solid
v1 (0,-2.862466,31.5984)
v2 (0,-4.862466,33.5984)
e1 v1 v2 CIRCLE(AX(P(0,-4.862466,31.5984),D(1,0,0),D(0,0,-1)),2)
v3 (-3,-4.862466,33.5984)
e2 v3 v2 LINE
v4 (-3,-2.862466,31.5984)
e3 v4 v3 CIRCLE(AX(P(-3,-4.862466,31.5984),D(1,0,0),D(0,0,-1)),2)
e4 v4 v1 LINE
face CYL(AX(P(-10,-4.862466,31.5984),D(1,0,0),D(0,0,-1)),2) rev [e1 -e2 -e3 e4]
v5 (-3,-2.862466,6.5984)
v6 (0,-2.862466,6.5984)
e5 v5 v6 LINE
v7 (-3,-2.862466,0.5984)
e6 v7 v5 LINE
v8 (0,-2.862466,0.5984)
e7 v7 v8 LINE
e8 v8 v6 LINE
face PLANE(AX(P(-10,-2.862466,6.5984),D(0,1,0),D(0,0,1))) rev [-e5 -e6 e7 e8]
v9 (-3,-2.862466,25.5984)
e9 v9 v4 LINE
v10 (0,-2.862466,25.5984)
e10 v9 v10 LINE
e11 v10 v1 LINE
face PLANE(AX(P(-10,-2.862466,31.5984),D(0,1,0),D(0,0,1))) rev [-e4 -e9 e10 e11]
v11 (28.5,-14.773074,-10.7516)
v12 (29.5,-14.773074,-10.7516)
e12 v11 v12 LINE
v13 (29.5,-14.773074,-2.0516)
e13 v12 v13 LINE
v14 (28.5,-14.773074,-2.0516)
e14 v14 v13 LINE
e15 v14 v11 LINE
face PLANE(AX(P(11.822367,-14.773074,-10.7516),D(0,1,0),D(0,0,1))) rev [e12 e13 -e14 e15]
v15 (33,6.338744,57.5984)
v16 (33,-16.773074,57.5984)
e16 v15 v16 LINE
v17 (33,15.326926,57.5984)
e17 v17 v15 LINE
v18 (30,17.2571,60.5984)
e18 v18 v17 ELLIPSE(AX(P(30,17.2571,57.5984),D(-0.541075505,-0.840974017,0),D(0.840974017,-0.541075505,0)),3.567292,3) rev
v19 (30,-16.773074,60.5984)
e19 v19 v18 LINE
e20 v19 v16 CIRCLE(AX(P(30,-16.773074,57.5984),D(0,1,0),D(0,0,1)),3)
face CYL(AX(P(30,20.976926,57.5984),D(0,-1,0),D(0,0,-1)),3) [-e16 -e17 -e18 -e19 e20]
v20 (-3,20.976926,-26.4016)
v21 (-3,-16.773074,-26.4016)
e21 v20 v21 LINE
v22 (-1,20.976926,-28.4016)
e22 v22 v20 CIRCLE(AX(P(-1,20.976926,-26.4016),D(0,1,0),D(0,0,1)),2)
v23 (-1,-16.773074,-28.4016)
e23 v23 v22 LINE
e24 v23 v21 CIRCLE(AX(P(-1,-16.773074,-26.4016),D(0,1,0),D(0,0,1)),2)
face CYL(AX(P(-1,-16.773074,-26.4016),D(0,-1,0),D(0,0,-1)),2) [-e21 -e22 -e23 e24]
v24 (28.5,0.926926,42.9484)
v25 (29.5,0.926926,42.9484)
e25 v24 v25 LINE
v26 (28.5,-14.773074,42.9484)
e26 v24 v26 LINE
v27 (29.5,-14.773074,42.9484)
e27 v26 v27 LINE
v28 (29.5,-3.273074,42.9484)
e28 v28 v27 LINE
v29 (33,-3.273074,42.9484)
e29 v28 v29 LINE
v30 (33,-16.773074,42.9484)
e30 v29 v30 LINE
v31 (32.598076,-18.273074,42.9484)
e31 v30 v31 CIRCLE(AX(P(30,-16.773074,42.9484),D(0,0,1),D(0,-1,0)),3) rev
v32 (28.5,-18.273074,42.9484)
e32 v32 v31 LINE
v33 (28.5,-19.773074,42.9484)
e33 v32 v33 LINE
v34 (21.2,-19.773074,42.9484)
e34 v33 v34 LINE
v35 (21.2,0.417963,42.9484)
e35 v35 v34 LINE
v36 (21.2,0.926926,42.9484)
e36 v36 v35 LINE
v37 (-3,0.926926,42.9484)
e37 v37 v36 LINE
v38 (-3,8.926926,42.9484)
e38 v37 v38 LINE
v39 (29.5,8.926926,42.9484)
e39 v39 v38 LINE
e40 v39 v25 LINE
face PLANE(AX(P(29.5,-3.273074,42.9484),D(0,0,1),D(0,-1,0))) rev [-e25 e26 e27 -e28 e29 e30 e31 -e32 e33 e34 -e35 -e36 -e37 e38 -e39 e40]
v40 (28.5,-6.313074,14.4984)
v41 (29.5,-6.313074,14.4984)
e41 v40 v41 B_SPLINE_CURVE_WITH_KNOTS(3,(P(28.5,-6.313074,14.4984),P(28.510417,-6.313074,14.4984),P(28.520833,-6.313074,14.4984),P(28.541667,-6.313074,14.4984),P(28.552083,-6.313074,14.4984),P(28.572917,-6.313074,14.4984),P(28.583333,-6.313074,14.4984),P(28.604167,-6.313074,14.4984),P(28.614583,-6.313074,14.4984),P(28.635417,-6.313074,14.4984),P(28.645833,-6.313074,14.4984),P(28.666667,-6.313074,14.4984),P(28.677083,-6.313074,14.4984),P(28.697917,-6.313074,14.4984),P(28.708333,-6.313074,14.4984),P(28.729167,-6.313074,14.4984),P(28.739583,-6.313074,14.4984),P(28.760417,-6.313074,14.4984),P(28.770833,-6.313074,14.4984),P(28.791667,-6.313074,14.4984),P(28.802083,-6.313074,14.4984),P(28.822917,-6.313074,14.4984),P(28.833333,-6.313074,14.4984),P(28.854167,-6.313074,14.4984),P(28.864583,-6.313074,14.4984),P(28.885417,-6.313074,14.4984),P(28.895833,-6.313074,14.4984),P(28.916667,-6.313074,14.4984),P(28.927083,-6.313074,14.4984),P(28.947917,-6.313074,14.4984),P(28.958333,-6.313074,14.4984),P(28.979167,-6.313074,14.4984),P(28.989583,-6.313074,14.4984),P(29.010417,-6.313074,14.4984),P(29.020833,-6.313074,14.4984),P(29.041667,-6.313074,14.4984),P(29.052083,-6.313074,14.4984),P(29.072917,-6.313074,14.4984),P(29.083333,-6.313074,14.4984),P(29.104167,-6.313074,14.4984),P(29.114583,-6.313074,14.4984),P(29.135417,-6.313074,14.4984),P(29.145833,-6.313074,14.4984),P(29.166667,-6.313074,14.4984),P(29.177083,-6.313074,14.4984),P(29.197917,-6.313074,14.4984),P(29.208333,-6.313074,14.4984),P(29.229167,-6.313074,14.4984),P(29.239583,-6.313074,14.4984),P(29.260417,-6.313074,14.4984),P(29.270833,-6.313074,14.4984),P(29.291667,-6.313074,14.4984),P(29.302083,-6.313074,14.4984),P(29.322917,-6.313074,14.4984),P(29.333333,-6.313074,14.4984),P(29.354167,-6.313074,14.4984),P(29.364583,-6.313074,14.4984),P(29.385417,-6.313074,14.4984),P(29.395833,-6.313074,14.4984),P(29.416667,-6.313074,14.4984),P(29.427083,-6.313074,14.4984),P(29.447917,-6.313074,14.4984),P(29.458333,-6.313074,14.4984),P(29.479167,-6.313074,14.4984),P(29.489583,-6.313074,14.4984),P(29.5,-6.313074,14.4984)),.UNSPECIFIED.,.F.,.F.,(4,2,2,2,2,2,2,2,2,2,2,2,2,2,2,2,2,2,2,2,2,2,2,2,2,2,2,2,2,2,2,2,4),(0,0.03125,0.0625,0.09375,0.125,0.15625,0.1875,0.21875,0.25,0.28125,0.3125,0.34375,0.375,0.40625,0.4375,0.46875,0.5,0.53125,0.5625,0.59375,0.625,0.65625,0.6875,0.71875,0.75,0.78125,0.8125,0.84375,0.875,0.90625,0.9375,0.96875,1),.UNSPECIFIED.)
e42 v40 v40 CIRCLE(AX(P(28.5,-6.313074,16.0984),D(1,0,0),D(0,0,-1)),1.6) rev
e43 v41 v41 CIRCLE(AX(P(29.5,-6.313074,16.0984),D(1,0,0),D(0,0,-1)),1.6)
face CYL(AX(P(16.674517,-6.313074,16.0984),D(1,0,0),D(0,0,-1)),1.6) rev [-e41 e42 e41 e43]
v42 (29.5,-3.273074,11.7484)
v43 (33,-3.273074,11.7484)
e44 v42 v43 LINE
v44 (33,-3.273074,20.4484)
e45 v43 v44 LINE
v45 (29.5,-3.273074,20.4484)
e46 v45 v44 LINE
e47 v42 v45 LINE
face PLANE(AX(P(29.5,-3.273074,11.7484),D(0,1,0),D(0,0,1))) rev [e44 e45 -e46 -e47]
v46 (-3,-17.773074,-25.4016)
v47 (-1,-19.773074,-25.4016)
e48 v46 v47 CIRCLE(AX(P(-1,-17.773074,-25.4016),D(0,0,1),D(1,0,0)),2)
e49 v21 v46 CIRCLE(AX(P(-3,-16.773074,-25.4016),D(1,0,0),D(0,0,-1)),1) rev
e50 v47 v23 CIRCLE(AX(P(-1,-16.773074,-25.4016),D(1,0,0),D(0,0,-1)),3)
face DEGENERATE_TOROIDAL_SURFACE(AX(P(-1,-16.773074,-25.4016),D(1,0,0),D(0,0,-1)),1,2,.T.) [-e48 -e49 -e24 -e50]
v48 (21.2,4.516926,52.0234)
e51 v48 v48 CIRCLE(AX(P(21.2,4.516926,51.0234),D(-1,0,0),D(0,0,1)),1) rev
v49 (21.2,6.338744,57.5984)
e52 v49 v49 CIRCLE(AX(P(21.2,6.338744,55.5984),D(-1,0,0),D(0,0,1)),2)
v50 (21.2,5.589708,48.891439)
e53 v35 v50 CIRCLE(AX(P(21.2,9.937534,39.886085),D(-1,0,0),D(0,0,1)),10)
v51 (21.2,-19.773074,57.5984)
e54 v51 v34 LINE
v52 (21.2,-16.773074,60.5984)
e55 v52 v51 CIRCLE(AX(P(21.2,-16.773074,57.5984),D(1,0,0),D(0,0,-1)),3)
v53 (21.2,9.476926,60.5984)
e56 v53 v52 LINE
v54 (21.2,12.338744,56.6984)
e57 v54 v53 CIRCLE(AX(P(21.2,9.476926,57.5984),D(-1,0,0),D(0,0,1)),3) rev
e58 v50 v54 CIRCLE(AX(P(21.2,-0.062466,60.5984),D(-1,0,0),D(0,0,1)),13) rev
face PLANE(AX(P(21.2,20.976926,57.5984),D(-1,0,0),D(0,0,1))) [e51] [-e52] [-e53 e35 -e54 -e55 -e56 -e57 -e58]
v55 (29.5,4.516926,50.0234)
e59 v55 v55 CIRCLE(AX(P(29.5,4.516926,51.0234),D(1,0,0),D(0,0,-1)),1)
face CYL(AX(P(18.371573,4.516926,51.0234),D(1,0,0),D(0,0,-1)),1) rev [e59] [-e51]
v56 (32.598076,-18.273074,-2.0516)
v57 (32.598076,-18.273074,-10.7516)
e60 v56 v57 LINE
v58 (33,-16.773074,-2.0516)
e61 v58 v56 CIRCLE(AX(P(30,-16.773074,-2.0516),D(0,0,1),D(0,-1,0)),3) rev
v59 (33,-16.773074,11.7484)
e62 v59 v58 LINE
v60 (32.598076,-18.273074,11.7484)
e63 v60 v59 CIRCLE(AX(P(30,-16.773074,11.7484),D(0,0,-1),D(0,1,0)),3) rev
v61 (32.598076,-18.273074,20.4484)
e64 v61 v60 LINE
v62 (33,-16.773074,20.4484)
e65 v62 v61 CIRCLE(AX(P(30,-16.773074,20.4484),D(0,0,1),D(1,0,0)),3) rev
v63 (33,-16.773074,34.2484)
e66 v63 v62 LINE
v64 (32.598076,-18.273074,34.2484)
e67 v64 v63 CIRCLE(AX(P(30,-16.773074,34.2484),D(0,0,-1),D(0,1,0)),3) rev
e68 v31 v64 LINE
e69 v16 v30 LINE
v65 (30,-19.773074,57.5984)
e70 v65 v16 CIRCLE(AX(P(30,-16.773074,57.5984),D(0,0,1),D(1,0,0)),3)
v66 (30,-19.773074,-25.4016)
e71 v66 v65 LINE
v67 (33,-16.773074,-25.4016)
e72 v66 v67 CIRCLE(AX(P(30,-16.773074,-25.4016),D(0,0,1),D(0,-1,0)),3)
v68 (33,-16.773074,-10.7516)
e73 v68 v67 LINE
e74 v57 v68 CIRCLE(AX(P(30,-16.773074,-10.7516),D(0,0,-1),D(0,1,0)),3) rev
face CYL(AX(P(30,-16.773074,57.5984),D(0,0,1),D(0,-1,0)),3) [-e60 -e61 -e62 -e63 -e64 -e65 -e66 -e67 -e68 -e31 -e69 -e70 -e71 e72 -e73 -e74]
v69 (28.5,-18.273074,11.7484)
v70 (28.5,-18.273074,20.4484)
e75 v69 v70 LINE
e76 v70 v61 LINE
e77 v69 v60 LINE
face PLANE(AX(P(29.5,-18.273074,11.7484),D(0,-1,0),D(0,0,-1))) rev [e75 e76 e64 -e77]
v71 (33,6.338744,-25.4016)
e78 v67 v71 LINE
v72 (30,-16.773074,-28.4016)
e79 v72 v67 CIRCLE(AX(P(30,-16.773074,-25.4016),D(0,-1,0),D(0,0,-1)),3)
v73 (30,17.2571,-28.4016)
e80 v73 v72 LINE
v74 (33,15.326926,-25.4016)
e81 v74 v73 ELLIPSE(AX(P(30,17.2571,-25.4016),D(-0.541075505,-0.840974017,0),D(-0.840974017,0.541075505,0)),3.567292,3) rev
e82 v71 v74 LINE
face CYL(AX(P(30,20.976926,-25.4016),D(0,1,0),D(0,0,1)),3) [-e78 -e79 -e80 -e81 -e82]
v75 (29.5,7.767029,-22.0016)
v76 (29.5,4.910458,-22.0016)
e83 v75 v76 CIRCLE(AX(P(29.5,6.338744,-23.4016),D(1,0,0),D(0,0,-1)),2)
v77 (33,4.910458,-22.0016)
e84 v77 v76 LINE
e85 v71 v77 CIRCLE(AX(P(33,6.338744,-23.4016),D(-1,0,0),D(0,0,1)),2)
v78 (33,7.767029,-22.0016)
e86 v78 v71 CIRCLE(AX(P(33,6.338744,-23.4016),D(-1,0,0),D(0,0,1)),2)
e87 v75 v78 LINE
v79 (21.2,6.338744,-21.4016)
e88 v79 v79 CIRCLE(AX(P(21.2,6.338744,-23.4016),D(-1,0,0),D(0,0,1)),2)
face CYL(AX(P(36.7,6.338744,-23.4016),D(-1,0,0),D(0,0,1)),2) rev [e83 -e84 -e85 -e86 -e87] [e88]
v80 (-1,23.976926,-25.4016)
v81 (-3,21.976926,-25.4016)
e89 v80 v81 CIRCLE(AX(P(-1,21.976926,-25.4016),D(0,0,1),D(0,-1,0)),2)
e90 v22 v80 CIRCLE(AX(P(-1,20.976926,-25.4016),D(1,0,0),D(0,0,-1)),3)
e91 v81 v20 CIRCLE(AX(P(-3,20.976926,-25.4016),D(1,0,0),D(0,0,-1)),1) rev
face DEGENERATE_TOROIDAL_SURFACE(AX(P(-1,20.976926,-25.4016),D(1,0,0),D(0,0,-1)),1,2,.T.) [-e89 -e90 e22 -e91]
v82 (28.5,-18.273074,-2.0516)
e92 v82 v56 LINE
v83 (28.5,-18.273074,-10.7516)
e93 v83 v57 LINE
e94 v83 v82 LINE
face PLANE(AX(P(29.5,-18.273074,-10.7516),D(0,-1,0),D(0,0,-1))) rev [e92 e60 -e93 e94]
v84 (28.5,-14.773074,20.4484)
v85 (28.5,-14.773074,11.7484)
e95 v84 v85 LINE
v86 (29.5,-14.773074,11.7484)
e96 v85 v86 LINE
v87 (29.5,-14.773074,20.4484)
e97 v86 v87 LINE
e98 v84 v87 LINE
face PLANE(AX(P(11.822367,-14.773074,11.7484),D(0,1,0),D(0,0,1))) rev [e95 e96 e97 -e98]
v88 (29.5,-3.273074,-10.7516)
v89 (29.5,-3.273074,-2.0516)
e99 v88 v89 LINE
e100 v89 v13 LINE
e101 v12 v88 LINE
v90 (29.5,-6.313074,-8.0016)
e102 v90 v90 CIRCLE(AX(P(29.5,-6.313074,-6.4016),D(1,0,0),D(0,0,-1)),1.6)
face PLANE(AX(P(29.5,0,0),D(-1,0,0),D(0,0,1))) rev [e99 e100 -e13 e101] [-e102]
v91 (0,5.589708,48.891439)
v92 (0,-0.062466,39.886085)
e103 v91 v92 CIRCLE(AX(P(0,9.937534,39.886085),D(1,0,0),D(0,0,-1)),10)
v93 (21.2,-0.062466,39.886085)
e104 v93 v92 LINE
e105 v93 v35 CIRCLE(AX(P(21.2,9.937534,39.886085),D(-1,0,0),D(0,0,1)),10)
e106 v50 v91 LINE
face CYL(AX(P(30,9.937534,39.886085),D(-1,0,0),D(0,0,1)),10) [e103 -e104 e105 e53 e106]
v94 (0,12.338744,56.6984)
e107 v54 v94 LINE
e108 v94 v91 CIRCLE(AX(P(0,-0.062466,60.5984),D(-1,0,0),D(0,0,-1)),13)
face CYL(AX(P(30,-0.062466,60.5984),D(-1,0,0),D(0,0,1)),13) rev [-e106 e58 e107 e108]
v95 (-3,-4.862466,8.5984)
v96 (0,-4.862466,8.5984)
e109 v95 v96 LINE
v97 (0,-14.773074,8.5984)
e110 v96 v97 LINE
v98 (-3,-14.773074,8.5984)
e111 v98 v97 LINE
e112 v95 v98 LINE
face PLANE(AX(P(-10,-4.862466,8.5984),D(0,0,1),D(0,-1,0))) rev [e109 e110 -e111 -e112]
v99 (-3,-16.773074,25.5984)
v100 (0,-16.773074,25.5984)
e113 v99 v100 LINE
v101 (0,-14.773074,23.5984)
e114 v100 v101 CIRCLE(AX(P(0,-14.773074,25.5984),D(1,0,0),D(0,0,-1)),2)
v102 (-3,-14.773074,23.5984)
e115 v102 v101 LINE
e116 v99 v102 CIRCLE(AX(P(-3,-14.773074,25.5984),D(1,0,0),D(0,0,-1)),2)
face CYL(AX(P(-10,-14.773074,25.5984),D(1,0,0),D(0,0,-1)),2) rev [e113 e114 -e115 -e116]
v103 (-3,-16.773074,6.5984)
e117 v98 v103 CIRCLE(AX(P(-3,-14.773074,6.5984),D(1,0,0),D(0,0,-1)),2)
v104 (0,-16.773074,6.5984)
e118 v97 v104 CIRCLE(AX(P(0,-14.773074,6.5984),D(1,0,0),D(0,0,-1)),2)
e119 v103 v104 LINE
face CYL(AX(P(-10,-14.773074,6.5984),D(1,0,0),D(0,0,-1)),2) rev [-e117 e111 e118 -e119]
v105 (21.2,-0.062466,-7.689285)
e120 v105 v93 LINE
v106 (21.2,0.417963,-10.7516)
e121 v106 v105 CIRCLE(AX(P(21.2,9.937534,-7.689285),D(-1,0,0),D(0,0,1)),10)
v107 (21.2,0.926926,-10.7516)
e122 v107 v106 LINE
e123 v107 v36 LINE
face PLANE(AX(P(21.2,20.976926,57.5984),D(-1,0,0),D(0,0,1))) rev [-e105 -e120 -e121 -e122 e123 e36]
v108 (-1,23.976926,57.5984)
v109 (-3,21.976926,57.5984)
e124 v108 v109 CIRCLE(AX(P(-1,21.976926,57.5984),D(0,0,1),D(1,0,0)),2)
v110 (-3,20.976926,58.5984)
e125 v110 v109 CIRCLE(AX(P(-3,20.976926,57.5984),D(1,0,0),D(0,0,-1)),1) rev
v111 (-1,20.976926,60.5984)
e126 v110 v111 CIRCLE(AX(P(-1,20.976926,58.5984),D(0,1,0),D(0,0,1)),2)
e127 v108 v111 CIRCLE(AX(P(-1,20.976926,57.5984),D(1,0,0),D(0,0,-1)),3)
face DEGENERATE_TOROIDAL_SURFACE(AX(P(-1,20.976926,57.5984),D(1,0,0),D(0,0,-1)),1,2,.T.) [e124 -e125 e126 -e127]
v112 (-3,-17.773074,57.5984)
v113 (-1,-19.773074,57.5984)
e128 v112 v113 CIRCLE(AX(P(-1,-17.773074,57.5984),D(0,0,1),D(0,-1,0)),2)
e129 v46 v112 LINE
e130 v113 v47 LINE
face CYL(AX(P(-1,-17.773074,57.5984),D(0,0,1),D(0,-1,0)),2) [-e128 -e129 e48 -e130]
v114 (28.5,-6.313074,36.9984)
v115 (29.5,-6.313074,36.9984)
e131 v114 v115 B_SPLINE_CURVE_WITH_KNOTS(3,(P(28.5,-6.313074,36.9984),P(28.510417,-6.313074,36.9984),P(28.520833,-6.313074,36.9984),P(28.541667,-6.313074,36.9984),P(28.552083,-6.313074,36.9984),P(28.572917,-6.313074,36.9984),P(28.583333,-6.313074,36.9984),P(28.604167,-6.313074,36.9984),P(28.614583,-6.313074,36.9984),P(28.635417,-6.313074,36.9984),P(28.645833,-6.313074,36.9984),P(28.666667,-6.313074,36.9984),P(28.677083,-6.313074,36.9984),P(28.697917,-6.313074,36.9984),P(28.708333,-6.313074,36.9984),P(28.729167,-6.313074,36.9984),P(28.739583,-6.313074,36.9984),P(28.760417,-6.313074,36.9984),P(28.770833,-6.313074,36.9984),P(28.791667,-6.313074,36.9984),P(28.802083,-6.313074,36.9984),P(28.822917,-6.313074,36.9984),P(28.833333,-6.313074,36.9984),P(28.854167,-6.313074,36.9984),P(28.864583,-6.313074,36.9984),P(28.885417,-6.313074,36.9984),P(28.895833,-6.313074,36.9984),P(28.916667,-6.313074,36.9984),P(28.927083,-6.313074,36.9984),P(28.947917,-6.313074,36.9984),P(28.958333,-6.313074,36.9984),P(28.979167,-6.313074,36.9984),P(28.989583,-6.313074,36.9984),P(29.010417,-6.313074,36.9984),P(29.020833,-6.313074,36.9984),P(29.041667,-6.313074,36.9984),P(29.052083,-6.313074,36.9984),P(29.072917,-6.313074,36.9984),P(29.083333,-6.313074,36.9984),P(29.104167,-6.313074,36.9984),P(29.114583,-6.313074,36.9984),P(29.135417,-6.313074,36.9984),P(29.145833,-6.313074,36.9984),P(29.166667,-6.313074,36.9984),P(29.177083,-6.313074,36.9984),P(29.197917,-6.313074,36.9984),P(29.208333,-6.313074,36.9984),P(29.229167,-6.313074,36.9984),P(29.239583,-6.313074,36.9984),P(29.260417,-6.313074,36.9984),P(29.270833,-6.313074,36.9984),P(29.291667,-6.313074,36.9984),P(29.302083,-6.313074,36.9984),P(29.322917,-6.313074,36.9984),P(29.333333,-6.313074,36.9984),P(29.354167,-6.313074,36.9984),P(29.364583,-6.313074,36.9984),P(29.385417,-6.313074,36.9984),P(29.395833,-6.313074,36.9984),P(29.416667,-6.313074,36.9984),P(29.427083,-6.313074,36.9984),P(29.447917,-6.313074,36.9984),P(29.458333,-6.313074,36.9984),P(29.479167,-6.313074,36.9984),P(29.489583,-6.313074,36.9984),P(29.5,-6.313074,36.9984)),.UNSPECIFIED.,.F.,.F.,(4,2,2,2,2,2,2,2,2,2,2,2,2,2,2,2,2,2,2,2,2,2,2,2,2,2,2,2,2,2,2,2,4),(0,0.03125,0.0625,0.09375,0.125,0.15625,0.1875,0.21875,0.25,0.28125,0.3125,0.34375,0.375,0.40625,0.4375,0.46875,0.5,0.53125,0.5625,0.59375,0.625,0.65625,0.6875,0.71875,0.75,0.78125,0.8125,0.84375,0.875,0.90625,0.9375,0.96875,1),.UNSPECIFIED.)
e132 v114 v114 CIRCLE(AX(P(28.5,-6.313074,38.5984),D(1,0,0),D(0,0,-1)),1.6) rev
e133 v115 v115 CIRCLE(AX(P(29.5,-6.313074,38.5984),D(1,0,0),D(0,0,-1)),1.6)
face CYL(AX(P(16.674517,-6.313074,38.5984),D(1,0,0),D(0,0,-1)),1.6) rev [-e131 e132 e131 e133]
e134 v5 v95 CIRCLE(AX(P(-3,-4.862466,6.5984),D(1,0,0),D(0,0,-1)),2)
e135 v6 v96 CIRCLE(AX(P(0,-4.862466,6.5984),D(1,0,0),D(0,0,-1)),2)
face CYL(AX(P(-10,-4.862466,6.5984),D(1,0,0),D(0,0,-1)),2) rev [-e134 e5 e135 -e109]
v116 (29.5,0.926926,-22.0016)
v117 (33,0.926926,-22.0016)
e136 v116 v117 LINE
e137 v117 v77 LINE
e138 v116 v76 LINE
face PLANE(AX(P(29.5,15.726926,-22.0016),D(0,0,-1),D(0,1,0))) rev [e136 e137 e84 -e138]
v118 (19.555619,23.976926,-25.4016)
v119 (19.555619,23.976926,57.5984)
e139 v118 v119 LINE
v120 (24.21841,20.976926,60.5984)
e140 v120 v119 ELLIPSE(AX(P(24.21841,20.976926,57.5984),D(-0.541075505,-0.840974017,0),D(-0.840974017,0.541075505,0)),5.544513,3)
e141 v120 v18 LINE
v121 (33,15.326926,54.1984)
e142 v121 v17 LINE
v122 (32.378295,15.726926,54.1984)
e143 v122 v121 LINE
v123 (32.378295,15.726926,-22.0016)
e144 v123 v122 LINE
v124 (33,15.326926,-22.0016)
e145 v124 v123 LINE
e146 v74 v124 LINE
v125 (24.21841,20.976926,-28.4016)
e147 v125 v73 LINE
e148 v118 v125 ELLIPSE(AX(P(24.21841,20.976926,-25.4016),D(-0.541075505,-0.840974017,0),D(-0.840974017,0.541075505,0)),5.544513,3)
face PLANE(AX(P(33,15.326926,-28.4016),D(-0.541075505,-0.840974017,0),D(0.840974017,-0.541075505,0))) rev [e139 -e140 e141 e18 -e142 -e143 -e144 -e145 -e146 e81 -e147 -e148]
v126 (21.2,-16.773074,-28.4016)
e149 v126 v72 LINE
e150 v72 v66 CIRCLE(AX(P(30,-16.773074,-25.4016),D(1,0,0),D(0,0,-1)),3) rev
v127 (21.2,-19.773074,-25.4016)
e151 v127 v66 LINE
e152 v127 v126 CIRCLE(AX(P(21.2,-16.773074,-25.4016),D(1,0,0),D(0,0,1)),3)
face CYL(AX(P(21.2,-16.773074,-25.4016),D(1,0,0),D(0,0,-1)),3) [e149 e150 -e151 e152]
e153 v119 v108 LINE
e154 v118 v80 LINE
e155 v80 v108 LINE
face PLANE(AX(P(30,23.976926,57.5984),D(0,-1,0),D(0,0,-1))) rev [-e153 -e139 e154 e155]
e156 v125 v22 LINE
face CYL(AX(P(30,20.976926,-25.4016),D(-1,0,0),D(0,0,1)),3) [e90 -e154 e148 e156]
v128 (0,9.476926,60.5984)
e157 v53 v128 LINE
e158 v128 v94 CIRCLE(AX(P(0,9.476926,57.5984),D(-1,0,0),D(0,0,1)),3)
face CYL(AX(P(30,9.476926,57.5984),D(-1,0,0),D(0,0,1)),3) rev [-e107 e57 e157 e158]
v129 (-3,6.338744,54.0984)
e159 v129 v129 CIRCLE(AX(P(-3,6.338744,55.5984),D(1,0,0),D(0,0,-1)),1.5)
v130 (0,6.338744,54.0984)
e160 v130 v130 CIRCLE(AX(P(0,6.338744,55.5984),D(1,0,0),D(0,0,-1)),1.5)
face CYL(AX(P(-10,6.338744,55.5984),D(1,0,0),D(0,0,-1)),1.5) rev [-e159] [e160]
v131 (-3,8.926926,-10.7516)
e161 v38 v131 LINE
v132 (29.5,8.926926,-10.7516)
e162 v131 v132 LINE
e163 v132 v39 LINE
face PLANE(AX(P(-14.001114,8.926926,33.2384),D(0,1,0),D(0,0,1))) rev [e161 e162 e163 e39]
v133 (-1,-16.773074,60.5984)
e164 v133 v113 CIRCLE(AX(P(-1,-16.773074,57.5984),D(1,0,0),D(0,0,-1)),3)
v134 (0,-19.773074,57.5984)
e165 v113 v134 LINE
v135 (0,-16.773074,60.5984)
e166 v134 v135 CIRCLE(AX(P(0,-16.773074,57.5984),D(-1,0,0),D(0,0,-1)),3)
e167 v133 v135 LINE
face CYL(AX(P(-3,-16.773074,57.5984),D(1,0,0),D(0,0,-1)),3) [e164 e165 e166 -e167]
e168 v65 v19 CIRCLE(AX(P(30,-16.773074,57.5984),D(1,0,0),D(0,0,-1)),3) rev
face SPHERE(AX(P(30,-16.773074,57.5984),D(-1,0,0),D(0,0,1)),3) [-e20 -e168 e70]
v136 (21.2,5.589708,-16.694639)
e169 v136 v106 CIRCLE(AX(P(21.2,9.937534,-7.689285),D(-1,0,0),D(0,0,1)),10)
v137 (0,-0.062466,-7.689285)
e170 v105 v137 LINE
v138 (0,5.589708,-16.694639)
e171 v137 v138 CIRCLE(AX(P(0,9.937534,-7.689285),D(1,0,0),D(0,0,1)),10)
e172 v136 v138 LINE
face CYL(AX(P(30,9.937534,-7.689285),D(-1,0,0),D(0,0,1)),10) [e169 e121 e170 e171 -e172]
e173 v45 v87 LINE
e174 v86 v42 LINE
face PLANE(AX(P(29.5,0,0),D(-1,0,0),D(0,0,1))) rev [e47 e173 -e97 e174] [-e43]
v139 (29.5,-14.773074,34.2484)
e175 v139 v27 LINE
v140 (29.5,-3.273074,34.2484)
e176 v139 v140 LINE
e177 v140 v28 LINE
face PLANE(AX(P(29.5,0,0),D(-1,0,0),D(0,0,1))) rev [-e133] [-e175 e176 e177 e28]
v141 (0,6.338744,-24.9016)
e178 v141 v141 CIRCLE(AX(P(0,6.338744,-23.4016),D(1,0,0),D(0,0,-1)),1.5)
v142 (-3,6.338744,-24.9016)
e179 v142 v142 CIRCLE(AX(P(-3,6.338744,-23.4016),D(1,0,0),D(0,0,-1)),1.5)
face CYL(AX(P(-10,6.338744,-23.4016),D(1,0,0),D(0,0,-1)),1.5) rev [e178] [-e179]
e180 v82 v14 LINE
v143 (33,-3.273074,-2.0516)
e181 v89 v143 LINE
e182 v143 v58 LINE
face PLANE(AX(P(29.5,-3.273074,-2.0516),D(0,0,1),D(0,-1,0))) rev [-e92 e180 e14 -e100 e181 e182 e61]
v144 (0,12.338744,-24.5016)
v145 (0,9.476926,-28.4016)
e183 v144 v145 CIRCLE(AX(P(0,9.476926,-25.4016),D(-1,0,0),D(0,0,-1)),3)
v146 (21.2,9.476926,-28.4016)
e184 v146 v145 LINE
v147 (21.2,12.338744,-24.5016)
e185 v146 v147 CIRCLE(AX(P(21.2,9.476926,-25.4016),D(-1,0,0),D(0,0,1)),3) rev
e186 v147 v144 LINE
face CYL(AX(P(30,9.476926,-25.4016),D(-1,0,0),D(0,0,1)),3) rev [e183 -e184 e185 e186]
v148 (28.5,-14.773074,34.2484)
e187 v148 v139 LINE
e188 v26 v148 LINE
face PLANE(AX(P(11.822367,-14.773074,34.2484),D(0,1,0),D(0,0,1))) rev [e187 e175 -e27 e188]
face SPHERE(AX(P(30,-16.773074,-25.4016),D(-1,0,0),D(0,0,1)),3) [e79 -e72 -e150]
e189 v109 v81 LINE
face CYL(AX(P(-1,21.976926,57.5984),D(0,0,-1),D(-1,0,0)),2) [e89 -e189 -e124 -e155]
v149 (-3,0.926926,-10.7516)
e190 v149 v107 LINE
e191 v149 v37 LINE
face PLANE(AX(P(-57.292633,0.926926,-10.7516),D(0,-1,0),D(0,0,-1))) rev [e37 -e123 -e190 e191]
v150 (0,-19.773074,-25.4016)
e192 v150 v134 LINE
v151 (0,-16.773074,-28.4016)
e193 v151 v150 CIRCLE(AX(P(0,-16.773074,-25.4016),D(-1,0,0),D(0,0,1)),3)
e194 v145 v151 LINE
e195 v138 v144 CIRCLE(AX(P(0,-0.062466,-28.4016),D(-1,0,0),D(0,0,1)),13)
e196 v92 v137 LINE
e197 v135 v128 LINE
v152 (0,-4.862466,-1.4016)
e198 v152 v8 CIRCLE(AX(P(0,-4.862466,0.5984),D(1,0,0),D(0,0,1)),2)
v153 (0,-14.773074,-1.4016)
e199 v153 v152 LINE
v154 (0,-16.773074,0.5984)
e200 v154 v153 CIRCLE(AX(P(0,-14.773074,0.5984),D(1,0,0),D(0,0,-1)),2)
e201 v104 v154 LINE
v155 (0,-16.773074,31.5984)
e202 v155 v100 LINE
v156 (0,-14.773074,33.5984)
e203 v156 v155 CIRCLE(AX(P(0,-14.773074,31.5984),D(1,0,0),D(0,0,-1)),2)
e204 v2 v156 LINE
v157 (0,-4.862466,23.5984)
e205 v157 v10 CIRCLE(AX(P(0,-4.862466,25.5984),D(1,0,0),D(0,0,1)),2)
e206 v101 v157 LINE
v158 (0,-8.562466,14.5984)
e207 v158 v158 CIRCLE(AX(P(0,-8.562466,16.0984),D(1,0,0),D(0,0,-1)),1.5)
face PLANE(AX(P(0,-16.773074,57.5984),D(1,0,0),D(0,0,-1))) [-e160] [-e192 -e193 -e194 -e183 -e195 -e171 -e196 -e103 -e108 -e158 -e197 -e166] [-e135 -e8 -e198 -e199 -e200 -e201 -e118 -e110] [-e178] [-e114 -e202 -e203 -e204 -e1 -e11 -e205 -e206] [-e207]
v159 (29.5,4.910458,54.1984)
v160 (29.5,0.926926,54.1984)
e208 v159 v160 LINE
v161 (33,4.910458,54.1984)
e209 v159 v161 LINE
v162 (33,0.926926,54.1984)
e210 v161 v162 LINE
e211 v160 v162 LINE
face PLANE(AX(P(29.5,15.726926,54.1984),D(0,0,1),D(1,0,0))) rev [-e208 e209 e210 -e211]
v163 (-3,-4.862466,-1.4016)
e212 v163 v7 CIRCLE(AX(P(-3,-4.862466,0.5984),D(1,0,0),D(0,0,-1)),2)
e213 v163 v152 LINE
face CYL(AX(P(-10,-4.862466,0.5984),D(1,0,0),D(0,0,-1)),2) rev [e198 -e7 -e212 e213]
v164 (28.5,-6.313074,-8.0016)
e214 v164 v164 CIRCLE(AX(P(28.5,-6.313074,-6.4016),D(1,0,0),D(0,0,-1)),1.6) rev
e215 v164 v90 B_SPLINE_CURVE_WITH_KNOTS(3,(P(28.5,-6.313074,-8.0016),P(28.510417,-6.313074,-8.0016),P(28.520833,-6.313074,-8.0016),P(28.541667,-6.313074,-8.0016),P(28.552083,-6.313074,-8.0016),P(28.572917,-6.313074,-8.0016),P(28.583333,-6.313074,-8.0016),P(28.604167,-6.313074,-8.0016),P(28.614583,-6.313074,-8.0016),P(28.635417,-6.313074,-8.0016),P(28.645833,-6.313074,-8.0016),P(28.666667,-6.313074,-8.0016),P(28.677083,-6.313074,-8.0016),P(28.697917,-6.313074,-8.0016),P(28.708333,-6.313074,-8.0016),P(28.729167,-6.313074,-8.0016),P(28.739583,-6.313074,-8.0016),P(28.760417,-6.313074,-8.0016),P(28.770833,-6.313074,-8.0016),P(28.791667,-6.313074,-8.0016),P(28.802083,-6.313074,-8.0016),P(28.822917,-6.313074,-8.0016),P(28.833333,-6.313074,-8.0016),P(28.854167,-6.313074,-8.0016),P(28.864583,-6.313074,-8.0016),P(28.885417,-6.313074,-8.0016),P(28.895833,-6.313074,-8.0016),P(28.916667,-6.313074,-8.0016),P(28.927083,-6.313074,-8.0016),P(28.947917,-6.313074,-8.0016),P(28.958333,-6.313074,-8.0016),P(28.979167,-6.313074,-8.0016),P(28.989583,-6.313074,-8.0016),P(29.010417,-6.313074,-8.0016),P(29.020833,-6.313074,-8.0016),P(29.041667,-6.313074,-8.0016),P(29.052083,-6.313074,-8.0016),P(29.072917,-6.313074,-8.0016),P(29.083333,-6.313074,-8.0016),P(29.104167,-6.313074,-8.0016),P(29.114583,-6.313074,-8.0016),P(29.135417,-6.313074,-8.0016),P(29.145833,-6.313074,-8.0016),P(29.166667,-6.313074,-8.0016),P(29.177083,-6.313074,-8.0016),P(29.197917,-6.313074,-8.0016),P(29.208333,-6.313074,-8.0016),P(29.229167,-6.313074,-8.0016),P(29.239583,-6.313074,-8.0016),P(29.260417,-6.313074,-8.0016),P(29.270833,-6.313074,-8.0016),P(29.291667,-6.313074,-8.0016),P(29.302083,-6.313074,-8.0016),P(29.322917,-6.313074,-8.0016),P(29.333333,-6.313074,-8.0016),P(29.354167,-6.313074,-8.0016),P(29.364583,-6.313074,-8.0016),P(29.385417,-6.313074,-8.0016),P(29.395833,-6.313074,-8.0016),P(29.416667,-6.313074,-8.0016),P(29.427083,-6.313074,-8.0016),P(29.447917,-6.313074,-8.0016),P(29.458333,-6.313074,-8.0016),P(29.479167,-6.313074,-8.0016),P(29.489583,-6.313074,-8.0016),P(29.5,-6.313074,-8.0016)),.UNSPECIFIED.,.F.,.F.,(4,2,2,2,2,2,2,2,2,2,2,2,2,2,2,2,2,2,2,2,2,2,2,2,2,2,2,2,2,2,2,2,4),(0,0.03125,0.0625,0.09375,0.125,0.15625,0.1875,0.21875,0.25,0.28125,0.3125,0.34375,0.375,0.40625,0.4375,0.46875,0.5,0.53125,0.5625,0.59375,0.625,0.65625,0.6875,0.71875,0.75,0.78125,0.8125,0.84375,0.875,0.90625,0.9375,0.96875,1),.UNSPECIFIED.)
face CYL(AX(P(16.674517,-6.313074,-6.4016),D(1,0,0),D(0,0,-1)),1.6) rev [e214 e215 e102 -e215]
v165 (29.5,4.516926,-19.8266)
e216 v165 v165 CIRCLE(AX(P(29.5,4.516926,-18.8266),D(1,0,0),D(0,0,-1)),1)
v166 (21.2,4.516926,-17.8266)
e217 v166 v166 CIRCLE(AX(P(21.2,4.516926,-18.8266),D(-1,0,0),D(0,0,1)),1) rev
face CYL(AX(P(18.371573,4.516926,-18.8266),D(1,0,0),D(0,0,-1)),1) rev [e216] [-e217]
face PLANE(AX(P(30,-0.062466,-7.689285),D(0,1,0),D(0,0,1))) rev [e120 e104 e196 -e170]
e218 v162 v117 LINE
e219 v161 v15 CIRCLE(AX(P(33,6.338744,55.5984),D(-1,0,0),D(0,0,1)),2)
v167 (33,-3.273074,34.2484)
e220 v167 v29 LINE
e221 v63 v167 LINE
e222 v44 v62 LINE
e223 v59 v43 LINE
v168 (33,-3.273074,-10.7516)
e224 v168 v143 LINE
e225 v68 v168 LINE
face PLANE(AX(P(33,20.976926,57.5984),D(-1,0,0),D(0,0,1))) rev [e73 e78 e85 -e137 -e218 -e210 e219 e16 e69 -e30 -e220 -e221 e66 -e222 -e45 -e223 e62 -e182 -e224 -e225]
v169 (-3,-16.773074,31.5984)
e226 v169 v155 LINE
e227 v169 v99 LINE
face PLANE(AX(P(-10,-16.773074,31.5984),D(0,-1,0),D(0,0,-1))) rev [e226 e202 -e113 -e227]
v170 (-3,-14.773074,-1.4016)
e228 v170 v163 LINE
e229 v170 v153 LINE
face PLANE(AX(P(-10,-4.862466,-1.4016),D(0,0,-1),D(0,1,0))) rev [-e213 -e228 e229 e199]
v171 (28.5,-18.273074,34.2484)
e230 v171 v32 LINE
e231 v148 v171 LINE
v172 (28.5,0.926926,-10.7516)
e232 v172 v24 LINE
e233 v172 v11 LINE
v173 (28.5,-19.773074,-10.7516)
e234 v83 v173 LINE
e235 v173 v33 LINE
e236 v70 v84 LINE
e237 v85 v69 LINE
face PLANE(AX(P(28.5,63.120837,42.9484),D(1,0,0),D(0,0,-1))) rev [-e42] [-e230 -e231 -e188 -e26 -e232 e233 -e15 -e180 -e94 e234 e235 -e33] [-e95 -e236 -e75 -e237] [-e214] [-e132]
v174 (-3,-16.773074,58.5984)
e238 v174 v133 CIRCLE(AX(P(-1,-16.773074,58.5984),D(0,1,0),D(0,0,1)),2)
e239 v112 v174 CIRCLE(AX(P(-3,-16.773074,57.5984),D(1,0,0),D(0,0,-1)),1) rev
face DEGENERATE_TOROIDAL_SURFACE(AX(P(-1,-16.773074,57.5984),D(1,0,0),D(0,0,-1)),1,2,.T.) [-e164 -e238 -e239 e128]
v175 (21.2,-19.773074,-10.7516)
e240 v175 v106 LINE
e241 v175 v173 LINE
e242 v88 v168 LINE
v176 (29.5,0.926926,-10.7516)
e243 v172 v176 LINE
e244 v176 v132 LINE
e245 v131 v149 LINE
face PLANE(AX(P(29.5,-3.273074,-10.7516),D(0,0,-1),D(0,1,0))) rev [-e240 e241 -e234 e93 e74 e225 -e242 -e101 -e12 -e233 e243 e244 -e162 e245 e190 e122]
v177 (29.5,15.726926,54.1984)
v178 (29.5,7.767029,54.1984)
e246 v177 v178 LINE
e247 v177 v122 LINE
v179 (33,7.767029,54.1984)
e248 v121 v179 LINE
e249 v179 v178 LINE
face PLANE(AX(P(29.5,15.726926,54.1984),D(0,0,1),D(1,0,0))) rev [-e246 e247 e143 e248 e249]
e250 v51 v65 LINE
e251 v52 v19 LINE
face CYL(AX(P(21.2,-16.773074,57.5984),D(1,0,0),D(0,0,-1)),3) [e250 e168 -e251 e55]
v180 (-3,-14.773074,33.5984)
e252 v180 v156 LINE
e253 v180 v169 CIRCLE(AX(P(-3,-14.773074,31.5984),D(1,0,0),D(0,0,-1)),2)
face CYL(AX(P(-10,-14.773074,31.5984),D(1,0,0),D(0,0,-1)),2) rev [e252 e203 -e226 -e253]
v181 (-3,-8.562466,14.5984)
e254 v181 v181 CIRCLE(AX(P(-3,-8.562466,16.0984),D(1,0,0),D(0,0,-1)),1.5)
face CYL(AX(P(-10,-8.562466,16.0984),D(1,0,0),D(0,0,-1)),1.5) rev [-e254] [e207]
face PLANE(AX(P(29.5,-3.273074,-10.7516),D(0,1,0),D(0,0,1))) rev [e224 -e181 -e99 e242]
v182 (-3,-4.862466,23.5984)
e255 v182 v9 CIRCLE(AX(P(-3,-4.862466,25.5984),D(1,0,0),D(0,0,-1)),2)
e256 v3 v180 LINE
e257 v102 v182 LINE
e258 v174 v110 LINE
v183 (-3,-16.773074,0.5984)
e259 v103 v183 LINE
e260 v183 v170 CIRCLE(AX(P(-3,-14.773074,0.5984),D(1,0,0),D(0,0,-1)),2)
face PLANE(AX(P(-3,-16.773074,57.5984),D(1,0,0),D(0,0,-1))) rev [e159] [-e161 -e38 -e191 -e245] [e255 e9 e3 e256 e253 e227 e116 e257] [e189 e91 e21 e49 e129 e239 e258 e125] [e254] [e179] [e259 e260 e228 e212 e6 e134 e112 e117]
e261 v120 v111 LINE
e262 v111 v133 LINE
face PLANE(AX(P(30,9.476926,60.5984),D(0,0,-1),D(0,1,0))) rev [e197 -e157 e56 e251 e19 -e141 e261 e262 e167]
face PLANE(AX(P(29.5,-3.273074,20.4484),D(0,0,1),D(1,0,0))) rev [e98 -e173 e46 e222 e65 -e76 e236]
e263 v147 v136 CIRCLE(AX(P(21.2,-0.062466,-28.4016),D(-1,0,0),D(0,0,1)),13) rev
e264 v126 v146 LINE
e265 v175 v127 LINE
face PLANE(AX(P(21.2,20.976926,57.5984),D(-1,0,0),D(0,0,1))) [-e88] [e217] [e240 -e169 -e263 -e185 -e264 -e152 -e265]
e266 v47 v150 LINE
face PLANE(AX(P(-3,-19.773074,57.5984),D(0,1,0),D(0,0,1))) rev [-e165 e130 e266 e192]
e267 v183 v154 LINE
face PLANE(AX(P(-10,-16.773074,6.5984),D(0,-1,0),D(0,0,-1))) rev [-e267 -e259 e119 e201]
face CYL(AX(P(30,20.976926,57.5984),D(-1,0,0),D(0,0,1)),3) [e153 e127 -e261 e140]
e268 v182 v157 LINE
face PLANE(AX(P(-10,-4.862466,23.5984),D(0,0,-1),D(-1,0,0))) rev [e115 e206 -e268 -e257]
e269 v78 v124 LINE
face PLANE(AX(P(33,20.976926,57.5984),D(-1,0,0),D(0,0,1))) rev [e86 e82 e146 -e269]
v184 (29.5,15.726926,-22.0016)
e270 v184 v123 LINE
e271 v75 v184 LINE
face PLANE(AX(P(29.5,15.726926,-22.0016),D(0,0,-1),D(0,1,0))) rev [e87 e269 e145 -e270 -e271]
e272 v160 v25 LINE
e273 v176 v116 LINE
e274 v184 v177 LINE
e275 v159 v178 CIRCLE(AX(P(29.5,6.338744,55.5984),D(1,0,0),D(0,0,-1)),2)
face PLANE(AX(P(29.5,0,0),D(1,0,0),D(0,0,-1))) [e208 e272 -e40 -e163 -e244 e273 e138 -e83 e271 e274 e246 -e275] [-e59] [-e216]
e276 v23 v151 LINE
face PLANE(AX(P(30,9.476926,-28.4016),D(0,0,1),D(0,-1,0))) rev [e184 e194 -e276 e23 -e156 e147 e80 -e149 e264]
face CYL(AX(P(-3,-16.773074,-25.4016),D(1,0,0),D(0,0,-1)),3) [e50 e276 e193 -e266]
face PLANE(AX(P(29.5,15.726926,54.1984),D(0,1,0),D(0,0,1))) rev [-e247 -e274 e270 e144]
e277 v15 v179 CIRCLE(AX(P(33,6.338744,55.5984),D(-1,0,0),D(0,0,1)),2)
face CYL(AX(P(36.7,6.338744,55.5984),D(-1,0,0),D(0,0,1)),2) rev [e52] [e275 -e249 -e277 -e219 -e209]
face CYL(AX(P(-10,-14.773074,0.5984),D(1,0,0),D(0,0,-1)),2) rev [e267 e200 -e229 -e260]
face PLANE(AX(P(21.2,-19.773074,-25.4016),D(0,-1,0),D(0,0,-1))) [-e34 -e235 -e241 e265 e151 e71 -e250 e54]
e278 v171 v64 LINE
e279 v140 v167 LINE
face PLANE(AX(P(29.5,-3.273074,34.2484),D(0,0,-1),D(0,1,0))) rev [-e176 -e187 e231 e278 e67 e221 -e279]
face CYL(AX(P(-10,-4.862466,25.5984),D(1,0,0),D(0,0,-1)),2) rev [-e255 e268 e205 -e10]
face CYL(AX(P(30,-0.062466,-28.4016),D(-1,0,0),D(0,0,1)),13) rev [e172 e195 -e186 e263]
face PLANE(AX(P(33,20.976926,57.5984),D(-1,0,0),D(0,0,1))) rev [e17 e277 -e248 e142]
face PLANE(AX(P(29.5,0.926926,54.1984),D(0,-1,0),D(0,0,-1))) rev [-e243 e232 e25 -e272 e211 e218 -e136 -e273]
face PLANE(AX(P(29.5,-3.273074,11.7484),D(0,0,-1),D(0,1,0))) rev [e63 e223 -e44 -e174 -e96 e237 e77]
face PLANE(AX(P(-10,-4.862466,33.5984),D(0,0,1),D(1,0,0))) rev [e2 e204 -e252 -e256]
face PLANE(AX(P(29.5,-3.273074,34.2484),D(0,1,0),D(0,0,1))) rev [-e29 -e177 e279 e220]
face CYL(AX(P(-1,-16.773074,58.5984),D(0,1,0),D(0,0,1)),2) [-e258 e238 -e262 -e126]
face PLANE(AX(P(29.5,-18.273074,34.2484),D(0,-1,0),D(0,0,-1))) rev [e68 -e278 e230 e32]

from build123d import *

# Parameters (mm, degrees)
RESSALTO_EXTRUS_O2_DEPTH      = 30
RESSALTO_EXTRUS_O3_START      = 3
RESSALTO_EXTRUS_O3_DEPTH      = 3
RESSALTO_EXTRUS_O4_DEPTH      = 3
RESSALTO_EXTRUS_O4_DEPTH_BACK = 8.8
ESBO_O10_R                    = 1.500000000000004
ESBO_O10_R_2                  = 1.5000000000000007
ESBO_O10_R_3                  = 1.5000000000000009
CORTE_EXTRUS_O3_DEPTH         = 9.999999999999998
CORTE_EXTRUS_O4_DEPTH         = 9.999999999999998
FILETE2_R                     = 2
ESBO_O13_R                    = 1.5000000000000007
ESBO_O13_R_2                  = 1.4999999999999998
CORTE_EXTRUS_O5_DEPTH         = 16
CORTE_EXTRUS_O6_DEPTH         = 3.5
ESBO_O16_R                    = 0.9999999999999981
ESBO_O16_R_2                  = 1.0000000000000013
CORTE_EXTRUS_O7_DEPTH         = 8.3
CORTE_EXTRUS_O8_DEPTH         = 3.5
ESBO_O20_R                    = 1.5999999999999979
ESBO_O20_R_2                  = 1.6000000000000019
CORTE_EXTRUS_O9_DEPTH         = 8.3
ESBO_O21_W                    = 8.700000000000001
ESBO_O21_H                    = 3.4999999999999982
CORTE_EXTRUS_O10_DEPTH        = 8.3
CORTE_EXTRUS_O11_DEPTH        = 8.3
CORTE_EXTRUS_O12_REACH        = 83.702
CORTE_EXTRUS_O15_DEPTH        = 98.90246669046874
ESBO_O27_R                    = 1.9999999999999996
CORTE_EXTRUS_O16_DEPTH        = 15.5
ESBO_O29_R                    = 2.000000000000003
CORTE_EXTRUS_O17_DEPTH        = 15.5
FILETE5_R                     = 3
CORTE_EXTRUS_O18_DEPTH        = 70.5176170215178
CORTE_EXTRUS_O18_DEPTH_BACK   = 24.2


with BuildPart() as part:
    # Esboço2 → Ressalto-extrusão2 (new body)
    with BuildSketch(Plane(origin=(0, 0, 0), x_dir=(0, 0, -1), z_dir=(1, 0, 0))):
        with BuildLine():
            Line((2.901599919865161, -0.06246593766177921), (-35.09840008013481, -0.06246593766176534))
            Line((-35.09840008013481, -0.06246593766176534), (-39.886084902926825, -0.06246593766177921))
            ThreePointArc((-39.886084902926825, -0.06246593766177921), (-45.20218023363878, 1.4676385237390175), (-48.891439327799866, 5.589707975381692))
            ThreePointArc((-48.891439327799866, 5.589707975381692), (-52.09653694789475, 9.772081498832542), (-56.69840008013493, 12.338743680758546))
            ThreePointArc((-56.69840008013493, 12.338743680758546), (-59.37322401506481, 11.895603400997262), (-60.5984000801349, 9.476926076507686))
            Line((-60.5984000801349, 9.476926076507686), (-60.598400080134894, 20.976926076507663))
            ThreePointArc((-60.598400080134894, 20.976926076507663), (-59.71972042369454, 23.098246420067323), (-57.59840008013488, 23.976926076507684))
            Line((-57.59840008013488, 23.976926076507684), (25.401599919865156, 23.976926076507684))
            ThreePointArc((25.401599919865156, 23.976926076507684), (27.522920263424812, 23.098246420067333), (28.401599919865177, 20.976926076507684))
            Line((28.401599919865177, 20.976926076507684), (28.40159991986526, 9.476926076507686))
            ThreePointArc((28.40159991986526, 9.476926076507686), (27.176423854795164, 11.895603400997262), (24.50159991986529, 12.338743680758546))
            ThreePointArc((24.50159991986529, 12.338743680758546), (19.8997367876251, 9.772081498832549), (16.69463916753021, 5.589707975381692))
            ThreePointArc((16.69463916753021, 5.589707975381692), (13.005380073369123, 1.467638523739021), (7.689284742657176, -0.06246593766177921))
            Line((7.689284742657176, -0.06246593766177921), (2.901599919865161, -0.06246593766177921))
        make_face()
    extrude(amount=RESSALTO_EXTRUS_O2_DEPTH)

    # Esboço3 → Ressalto-extrusão3 (add)
    with BuildSketch(Plane.ZY.offset(RESSALTO_EXTRUS_O3_START)):
        with BuildLine():
            Line((60.598400080134894, 15.226926076507677), (60.59840008013489, 20.976926076507663))
            ThreePointArc((60.59840008013489, 20.976926076507663), (59.71972042369454, 23.098246420067326), (57.59840008013487, 23.976926076507684))
            Line((57.59840008013487, 23.976926076507684), (16.09840008013486, 23.976926076507684))
            Line((16.09840008013486, 23.976926076507684), (-25.4015999198652, 23.976926076507684))
            ThreePointArc((-25.4015999198652, 23.976926076507684), (-27.52292026342486, 23.098246420067326), (-28.40159991986522, 20.976926076507663))
            Line((-28.40159991986522, 20.976926076507663), (-28.40159991986522, 15.226926076507686))
            Line((-28.40159991986522, 15.226926076507686), (-28.40159991986525, -16.773073923492294))
            ThreePointArc((-28.40159991986525, -16.773073923492294), (-27.522920263424897, -18.894394267051958), (-25.401599919865234, -19.77307392349232))
            Line((-25.401599919865234, -19.77307392349232), (57.59840008013488, -19.773073923492326))
            ThreePointArc((57.59840008013488, -19.773073923492326), (59.71972042369455, -18.89439426705197), (60.5984000801349, -16.7730739234923))
            Line((60.5984000801349, -16.7730739234923), (60.598400080134894, 15.226926076507677))
        make_face()
    extrude(amount=-RESSALTO_EXTRUS_O3_DEPTH)

    # Esboço4 → Ressalto-extrusão4 (add, two sides: drawn at the far end of the back side and taken through both)
    with BuildSketch(Plane(origin=(30, 0, 0), x_dir=(0, 0, -1), z_dir=(1, 0, 0)).offset(-RESSALTO_EXTRUS_O4_DEPTH_BACK)):
        with BuildLine():
            Line((-16.09840008013486, 23.976926076507684), (25.4015999198652, 23.976926076507684))
            ThreePointArc((25.4015999198652, 23.976926076507684), (27.52292026342486, 23.098246420067326), (28.40159991986522, 20.976926076507663))
            Line((28.40159991986522, 20.976926076507663), (28.40159991986522, 15.226926076507686))
            Line((28.40159991986522, 15.226926076507686), (28.40159991986523, -16.773073923492294))
            ThreePointArc((28.40159991986523, -16.773073923492294), (27.522920263424872, -18.89439426705196), (25.401599919865205, -19.77307392349232))
            Line((25.401599919865205, -19.77307392349232), (-57.598400080134866, -19.773073923492326))
            ThreePointArc((-57.598400080134866, -19.773073923492326), (-59.71972042369453, -18.89439426705197), (-60.59840008013489, -16.773073923492305))
            Line((-60.59840008013489, -16.773073923492305), (-60.598400080134894, 15.226926076507677))
            Line((-60.598400080134894, 15.226926076507677), (-60.598400080134894, 20.976926076507663))
            ThreePointArc((-60.598400080134894, 20.976926076507663), (-59.71972042369454, 23.098246420067326), (-57.59840008013487, 23.976926076507684))
            Line((-57.59840008013487, 23.976926076507684), (-16.09840008013486, 23.976926076507684))
        make_face()
    extrude(amount=RESSALTO_EXTRUS_O4_DEPTH + RESSALTO_EXTRUS_O4_DEPTH_BACK)

    # Esboço10 → Corte-extrusão3 (cut)
    with BuildSketch(Plane(origin=(0, 0, 0), x_dir=(0, 0, -1), z_dir=(1, 0, 0))):
        with Locations((-55.59840008013491, 6.338743680758544)):
            Circle(ESBO_O10_R)
        with Locations((23.401599919865223, 6.338743680758553)):
            Circle(ESBO_O10_R_2)
        with Locations((-16.098400080134773, -8.56246593766178)):
            Circle(ESBO_O10_R_3)
    extrude(amount=-CORTE_EXTRUS_O3_DEPTH, mode=Mode.SUBTRACT)

    # Esboço12 → Corte-extrusão4 (cut)
    with BuildSketch(Plane(origin=(0, 0, 0), x_dir=(0, 0, -1), z_dir=(1, 0, 0))):
        with BuildLine():
            Line((-31.59840008013476, -2.862465937661779), (-25.598400080134788, -2.862465937661779))
            ThreePointArc((-25.598400080134788, -2.862465937661779), (-24.184186517761677, -3.4482523752886847), (-23.598400080134773, -4.862465937661794))
            Line((-23.598400080134773, -4.862465937661794), (-23.598400080134773, -14.773073923492307))
            ThreePointArc((-23.598400080134773, -14.773073923492307), (-24.18418651776168, -16.187287485865415), (-25.598400080134788, -16.77307392349232))
            Line((-25.598400080134788, -16.77307392349232), (-31.59840008013476, -16.77307392349232))
            ThreePointArc((-31.59840008013476, -16.77307392349232), (-33.012613642507866, -16.187287485865415), (-33.59840008013477, -14.773073923492307))
            Line((-33.59840008013477, -14.773073923492307), (-33.59840008013477, -4.862465937661794))
            ThreePointArc((-33.59840008013477, -4.862465937661794), (-33.012613642507866, -3.4482523752886842), (-31.59840008013476, -2.862465937661779))
        make_face()
        with BuildLine():
            Line((-6.5984000801348905, -2.862465937661779), (-0.5984000801349185, -2.862465937661779))
            ThreePointArc((-0.5984000801349185, -2.862465937661779), (0.815813482238191, -3.4482523752886842), (1.4015999198650957, -4.862465937661794))
            Line((1.4015999198650957, -4.862465937661794), (1.401599919865097, -14.773073923492307))
            ThreePointArc((1.401599919865097, -14.773073923492307), (0.8158134822381905, -16.187287485865415), (-0.5984000801349172, -16.77307392349232))
            Line((-0.5984000801349172, -16.77307392349232), (-6.598400080134889, -16.77307392349232))
            ThreePointArc((-6.598400080134889, -16.77307392349232), (-8.012613642507999, -16.187287485865415), (-8.598400080134903, -14.773073923492307))
            Line((-8.598400080134903, -14.773073923492307), (-8.598400080134905, -4.862465937661794))
            ThreePointArc((-8.598400080134905, -4.862465937661794), (-8.012613642507999, -3.448252375288684), (-6.5984000801348905, -2.862465937661779))
        make_face()
    extrude(amount=-CORTE_EXTRUS_O4_DEPTH, mode=Mode.SUBTRACT)

    # Filete2
    filete2_edges = [part.edges().sort_by_distance(p)[0] for p in [
        (-3, 2.101926076507681, 60.598400080134894),
        (-3, 23.09824642006733, 59.71972042369454),
        (-3, 23.976926076507684, 16.098400080134837),
        (-3, 23.098246420067326, -27.52292026342486),
        (-3, 2.1019260765076844, -28.401599919865234),
        (-3, -18.894394267051958, -27.522920263424897),
        (-3, -19.773073923492323, 16.098400080134823),
        (-3, -18.89439426705197, 59.71972042369455),
    ]]
    fillet(filete2_edges, radius=FILETE2_R)

    # Esboço13 → Corte-extrusão5 (cut)
    with BuildSketch(Plane.ZY.offset(3)):
        with Locations((27.44840008013482, 3.97692607650768)):
            Circle(ESBO_O13_R)
        with Locations((4.7484000801348225, 3.97692607650768)):
            Circle(ESBO_O13_R_2)
    extrude(amount=-CORTE_EXTRUS_O5_DEPTH, mode=Mode.SUBTRACT)

    # Esboço14 → Corte-extrusão6 (cut)
    with BuildSketch(Plane(origin=(33, 0, 0), x_dir=(0, 0, -1), z_dir=(1, 0, 0))):
        Polygon((-54.198400080134846, 15.726926076507674), (22.00159991986516, 15.726926076507674), (22.001599919865164, 0.9269260765076732), (-54.198400080134846, 0.9269260765076732), align=None)
    extrude(amount=-CORTE_EXTRUS_O6_DEPTH, mode=Mode.SUBTRACT)

    # Esboço16 → Corte-extrusão7 (cut)
    with BuildSketch(Plane(origin=(29.500000000000004, 0, 0), x_dir=(0, 0, -1), z_dir=(1, 0, 0))):
        with Locations((-51.02340008013484, 4.516926076507664)):
            Circle(ESBO_O16_R)
        with Locations((18.826599919865156, 4.516926076507673)):
            Circle(ESBO_O16_R_2)
    extrude(amount=-CORTE_EXTRUS_O7_DEPTH, mode=Mode.SUBTRACT)

    # Esboço17 → Corte-extrusão8 (cut)
    with BuildSketch(Plane(origin=(33, 0, 0), x_dir=(0, 0, -1), z_dir=(1, 0, 0))):
        Polygon((10.751599919865162, -3.273073923492324), (2.051599919865163, -3.273073923492325), (2.0515999198651653, -18.273073923492326), (10.751599919865164, -18.273073923492323), align=None)
        Polygon((-11.748400080134838, -3.2730739234923263), (-20.448400080134835, -3.273073923492327), (-20.448400080134835, -18.273073923492326), (-11.748400080134836, -18.27307392349233), align=None)
        Polygon((-34.24840008013484, -3.273073923492329), (-42.94840008013484, -3.27307392349233), (-42.94840008013483, -18.273073923492333), (-34.248400080134836, -18.27307392349233), align=None)
    extrude(amount=-CORTE_EXTRUS_O8_DEPTH, mode=Mode.SUBTRACT)

    # Esboço20 → Corte-extrusão9 (cut)
    with BuildSketch(Plane(origin=(29.500000000000004, 0, 0), x_dir=(0, 0, -1), z_dir=(1, 0, 0))):
        with Locations((-38.59840008013484, -6.313073923492322)):
            Circle(ESBO_O20_R)
        with Locations((-16.098400080134837, -6.313073923492322)):
            Circle(ESBO_O20_R_2)
        with Locations((6.401599919865163, -6.313073923492322)):
            Circle(ESBO_O20_R_2)
    extrude(amount=-CORTE_EXTRUS_O9_DEPTH, mode=Mode.SUBTRACT)

    # Esboço21 → Corte-extrusão10 (cut)
    with BuildSketch(Plane(origin=(29.500000000000004, 0, 0), x_dir=(0, 0, -1), z_dir=(1, 0, 0))):
        Polygon((-34.248400080134836, -18.273073923492333), (-42.94840008013484, -18.273073923492333), (-42.94840008013484, -14.773073923492335), (-34.248400080134836, -14.773073923492332), align=None)
        Polygon((-11.748400080134836, -18.27307392349233), (-20.448400080134835, -18.27307392349233), (-20.448400080134835, -14.77307392349233), (-11.748400080134836, -14.773073923492328), align=None)
        with Locations((6.401599919865164, -16.523073923492326)):
            Rectangle(ESBO_O21_W, ESBO_O21_H)
    extrude(amount=-CORTE_EXTRUS_O10_DEPTH, mode=Mode.SUBTRACT)

    # Esboço22 → Corte-extrusão11 (cut)
    with BuildSketch(Plane(origin=(29.500000000000004, 0, 0), x_dir=(0, 0, -1), z_dir=(1, 0, 0))):
        Polygon((-33.238400080134845, 0.9269260765076732), (1.041599919865164, 0.9269260765076732), (1.0415999198651673, 8.926926076507673), (-33.238400080134845, 8.926926076507673), align=None)
    extrude(amount=-CORTE_EXTRUS_O11_DEPTH, mode=Mode.SUBTRACT)

    # Corte-extrusão12: up to this face of the body (flat: up to its plane)
    corte_extrus_o12_end = Plane(part.part.faces().sort_by_distance((25.35, 8.926926077, 16.09840008))[0])
    # Esboço23 → Corte-extrusão12 (cut, up to the picked face)
    with BuildSketch(Plane.XZ.offset(19.773073923492323), mode=Mode.PRIVATE) as corte_extrus_o12_sk1:
        Polygon((28.5, 42.94840008013484), (21.199999999999996, 42.94840008013484), (21.199999999999996, -10.751599919865157), (28.500000000000007, -10.751599919865157), align=None)
    corte_extrus_o12_tool1 = split(extrude(corte_extrus_o12_sk1.sketch, amount=-CORTE_EXTRUS_O12_REACH, mode=Mode.PRIVATE), bisect_by=corte_extrus_o12_end, keep=Keep.BOTH, mode=Mode.PRIVATE)
    add(corte_extrus_o12_tool1.solids().sort_by(Axis((24.85, -19.773074, 16.0984), (0, 1, 8e-17)))[0], mode=Mode.SUBTRACT)

    # Esboço26 → Corte-extrusão15 (cut, through all)
    with BuildSketch(Plane.XY.offset(60.59840008013491)):
        Polygon((33, 15.326926076507647), (19.555618972033173, 23.976926076507645), (33, 23.976926076507645), align=None)
    extrude(amount=-CORTE_EXTRUS_O15_DEPTH, mode=Mode.SUBTRACT)

    # Esboço27 → Corte-extrusão16 (cut)
    with BuildSketch(Plane.ZY.offset(-21.199999999999996)):
        with Locations((-23.401599919865223, 6.338743680758553)):
            Circle(ESBO_O27_R)
    extrude(amount=-CORTE_EXTRUS_O16_DEPTH, mode=Mode.SUBTRACT)

    # Esboço29 → Corte-extrusão17 (cut)
    with BuildSketch(Plane.ZY.offset(-21.199999999999996)):
        with Locations((55.59840008013491, 6.338743680758544)):
            Circle(ESBO_O29_R)
    extrude(amount=-CORTE_EXTRUS_O17_DEPTH, mode=Mode.SUBTRACT)

    # Filete5
    # the kernel refuses this fillet: 3 mm, written as the material it takes off along each edge
    with BuildSketch(Plane(origin=(33, -16.773073923492305, 60.59840008013489), x_dir=(-1, 0, 1.658e-14), z_dir=(0, 1, 1.9e-16))) as filete5_piece_1:
        with BuildLine():
            CenterArc((FILETE5_R, -FILETE5_R), FILETE5_R, 89.99999999999906, 90.00000000000108)
            Line((-4.974e-14, -FILETE5_R), (0, 0))
            Line((0, 0), (FILETE5_R, 0))
        make_face()
    extrude(amount=39.6, mode=Mode.SUBTRACT)
    with BuildSketch(Plane(origin=(33, -16.773073923492326, 57.59840008013489), x_dir=(0, -1, -7.11e-15), z_dir=(0, 7.11e-15, -1))) as filete5_piece_2:
        with BuildLine():
            CenterArc((3 - FILETE5_R, FILETE5_R), FILETE5_R, 270, 90)
            Line((3, FILETE5_R), (3, 0))
            Line((3, 0), (3 - FILETE5_R, 0))
        make_face()
    revolve(axis=Axis((33, -16.773073923492326, 57.59840008013489), (-1, 0, 0)), revolution_arc=90.00000000000081, mode=Mode.SUBTRACT)
    with BuildSketch(Plane(origin=(33, -19.77307392349232, -25.401599919865205), x_dir=(0, 1, 9e-17), z_dir=(0, -9e-17, 1))) as filete5_piece_3:
        with BuildLine():
            CenterArc((FILETE5_R, FILETE5_R), FILETE5_R, 180, 90)
            Line((0, FILETE5_R), (0, 0))
            Line((0, 0), (FILETE5_R, 0))
        make_face()
    extrude(amount=83.00000000000007, mode=Mode.SUBTRACT)
    with BuildSketch(Plane(origin=(33, -16.77307392349232, -25.401599919865227), x_dir=(0, 8.29e-15, -1), z_dir=(0, 1, 8.29e-15))) as filete5_piece_4:
        with BuildLine():
            CenterArc((3 - FILETE5_R, FILETE5_R), FILETE5_R, 270, 90)
            Line((3.0000000000000036, FILETE5_R), (3, 0))
            Line((3, 0), (3 - FILETE5_R, 0))
        make_face()
    revolve(axis=Axis((33, -16.77307392349232, -25.401599919865227), (-1, 0, 0)), revolution_arc=90.0000000000009, mode=Mode.SUBTRACT)
    with BuildSketch(Plane(origin=(33, 22.826926076507682, -28.401599919865216), x_dir=(0, -1.9e-16, 1), z_dir=(0, -1, -1.9e-16))) as filete5_piece_5:
        with BuildLine():
            CenterArc((FILETE5_R, FILETE5_R), FILETE5_R, 180, 90)
            Line((0, FILETE5_R), (0, 0))
            Line((0, 0), (FILETE5_R, 0))
        make_face()
    extrude(amount=39.59999999999998, mode=Mode.SUBTRACT)

    # Esboço30 → Corte-extrusão18 (cut, two sides: drawn at the far end of the back side and taken through both)
    with BuildSketch(Plane(origin=(21.199999999999996, 0, 0), x_dir=(0, 0, -1), z_dir=(1, 0, 0)).offset(-CORTE_EXTRUS_O18_DEPTH_BACK)):
        Polygon((10.751599919865157, 8.926926076507677), (-42.94840008013484, 8.92692607650767), (-42.94840008013484, 0.9269260765076663), (10.751599919865159, 0.9269260765076732), align=None)
    extrude(amount=CORTE_EXTRUS_O18_DEPTH + CORTE_EXTRUS_O18_DEPTH_BACK, mode=Mode.SUBTRACT)


solid = part.part
